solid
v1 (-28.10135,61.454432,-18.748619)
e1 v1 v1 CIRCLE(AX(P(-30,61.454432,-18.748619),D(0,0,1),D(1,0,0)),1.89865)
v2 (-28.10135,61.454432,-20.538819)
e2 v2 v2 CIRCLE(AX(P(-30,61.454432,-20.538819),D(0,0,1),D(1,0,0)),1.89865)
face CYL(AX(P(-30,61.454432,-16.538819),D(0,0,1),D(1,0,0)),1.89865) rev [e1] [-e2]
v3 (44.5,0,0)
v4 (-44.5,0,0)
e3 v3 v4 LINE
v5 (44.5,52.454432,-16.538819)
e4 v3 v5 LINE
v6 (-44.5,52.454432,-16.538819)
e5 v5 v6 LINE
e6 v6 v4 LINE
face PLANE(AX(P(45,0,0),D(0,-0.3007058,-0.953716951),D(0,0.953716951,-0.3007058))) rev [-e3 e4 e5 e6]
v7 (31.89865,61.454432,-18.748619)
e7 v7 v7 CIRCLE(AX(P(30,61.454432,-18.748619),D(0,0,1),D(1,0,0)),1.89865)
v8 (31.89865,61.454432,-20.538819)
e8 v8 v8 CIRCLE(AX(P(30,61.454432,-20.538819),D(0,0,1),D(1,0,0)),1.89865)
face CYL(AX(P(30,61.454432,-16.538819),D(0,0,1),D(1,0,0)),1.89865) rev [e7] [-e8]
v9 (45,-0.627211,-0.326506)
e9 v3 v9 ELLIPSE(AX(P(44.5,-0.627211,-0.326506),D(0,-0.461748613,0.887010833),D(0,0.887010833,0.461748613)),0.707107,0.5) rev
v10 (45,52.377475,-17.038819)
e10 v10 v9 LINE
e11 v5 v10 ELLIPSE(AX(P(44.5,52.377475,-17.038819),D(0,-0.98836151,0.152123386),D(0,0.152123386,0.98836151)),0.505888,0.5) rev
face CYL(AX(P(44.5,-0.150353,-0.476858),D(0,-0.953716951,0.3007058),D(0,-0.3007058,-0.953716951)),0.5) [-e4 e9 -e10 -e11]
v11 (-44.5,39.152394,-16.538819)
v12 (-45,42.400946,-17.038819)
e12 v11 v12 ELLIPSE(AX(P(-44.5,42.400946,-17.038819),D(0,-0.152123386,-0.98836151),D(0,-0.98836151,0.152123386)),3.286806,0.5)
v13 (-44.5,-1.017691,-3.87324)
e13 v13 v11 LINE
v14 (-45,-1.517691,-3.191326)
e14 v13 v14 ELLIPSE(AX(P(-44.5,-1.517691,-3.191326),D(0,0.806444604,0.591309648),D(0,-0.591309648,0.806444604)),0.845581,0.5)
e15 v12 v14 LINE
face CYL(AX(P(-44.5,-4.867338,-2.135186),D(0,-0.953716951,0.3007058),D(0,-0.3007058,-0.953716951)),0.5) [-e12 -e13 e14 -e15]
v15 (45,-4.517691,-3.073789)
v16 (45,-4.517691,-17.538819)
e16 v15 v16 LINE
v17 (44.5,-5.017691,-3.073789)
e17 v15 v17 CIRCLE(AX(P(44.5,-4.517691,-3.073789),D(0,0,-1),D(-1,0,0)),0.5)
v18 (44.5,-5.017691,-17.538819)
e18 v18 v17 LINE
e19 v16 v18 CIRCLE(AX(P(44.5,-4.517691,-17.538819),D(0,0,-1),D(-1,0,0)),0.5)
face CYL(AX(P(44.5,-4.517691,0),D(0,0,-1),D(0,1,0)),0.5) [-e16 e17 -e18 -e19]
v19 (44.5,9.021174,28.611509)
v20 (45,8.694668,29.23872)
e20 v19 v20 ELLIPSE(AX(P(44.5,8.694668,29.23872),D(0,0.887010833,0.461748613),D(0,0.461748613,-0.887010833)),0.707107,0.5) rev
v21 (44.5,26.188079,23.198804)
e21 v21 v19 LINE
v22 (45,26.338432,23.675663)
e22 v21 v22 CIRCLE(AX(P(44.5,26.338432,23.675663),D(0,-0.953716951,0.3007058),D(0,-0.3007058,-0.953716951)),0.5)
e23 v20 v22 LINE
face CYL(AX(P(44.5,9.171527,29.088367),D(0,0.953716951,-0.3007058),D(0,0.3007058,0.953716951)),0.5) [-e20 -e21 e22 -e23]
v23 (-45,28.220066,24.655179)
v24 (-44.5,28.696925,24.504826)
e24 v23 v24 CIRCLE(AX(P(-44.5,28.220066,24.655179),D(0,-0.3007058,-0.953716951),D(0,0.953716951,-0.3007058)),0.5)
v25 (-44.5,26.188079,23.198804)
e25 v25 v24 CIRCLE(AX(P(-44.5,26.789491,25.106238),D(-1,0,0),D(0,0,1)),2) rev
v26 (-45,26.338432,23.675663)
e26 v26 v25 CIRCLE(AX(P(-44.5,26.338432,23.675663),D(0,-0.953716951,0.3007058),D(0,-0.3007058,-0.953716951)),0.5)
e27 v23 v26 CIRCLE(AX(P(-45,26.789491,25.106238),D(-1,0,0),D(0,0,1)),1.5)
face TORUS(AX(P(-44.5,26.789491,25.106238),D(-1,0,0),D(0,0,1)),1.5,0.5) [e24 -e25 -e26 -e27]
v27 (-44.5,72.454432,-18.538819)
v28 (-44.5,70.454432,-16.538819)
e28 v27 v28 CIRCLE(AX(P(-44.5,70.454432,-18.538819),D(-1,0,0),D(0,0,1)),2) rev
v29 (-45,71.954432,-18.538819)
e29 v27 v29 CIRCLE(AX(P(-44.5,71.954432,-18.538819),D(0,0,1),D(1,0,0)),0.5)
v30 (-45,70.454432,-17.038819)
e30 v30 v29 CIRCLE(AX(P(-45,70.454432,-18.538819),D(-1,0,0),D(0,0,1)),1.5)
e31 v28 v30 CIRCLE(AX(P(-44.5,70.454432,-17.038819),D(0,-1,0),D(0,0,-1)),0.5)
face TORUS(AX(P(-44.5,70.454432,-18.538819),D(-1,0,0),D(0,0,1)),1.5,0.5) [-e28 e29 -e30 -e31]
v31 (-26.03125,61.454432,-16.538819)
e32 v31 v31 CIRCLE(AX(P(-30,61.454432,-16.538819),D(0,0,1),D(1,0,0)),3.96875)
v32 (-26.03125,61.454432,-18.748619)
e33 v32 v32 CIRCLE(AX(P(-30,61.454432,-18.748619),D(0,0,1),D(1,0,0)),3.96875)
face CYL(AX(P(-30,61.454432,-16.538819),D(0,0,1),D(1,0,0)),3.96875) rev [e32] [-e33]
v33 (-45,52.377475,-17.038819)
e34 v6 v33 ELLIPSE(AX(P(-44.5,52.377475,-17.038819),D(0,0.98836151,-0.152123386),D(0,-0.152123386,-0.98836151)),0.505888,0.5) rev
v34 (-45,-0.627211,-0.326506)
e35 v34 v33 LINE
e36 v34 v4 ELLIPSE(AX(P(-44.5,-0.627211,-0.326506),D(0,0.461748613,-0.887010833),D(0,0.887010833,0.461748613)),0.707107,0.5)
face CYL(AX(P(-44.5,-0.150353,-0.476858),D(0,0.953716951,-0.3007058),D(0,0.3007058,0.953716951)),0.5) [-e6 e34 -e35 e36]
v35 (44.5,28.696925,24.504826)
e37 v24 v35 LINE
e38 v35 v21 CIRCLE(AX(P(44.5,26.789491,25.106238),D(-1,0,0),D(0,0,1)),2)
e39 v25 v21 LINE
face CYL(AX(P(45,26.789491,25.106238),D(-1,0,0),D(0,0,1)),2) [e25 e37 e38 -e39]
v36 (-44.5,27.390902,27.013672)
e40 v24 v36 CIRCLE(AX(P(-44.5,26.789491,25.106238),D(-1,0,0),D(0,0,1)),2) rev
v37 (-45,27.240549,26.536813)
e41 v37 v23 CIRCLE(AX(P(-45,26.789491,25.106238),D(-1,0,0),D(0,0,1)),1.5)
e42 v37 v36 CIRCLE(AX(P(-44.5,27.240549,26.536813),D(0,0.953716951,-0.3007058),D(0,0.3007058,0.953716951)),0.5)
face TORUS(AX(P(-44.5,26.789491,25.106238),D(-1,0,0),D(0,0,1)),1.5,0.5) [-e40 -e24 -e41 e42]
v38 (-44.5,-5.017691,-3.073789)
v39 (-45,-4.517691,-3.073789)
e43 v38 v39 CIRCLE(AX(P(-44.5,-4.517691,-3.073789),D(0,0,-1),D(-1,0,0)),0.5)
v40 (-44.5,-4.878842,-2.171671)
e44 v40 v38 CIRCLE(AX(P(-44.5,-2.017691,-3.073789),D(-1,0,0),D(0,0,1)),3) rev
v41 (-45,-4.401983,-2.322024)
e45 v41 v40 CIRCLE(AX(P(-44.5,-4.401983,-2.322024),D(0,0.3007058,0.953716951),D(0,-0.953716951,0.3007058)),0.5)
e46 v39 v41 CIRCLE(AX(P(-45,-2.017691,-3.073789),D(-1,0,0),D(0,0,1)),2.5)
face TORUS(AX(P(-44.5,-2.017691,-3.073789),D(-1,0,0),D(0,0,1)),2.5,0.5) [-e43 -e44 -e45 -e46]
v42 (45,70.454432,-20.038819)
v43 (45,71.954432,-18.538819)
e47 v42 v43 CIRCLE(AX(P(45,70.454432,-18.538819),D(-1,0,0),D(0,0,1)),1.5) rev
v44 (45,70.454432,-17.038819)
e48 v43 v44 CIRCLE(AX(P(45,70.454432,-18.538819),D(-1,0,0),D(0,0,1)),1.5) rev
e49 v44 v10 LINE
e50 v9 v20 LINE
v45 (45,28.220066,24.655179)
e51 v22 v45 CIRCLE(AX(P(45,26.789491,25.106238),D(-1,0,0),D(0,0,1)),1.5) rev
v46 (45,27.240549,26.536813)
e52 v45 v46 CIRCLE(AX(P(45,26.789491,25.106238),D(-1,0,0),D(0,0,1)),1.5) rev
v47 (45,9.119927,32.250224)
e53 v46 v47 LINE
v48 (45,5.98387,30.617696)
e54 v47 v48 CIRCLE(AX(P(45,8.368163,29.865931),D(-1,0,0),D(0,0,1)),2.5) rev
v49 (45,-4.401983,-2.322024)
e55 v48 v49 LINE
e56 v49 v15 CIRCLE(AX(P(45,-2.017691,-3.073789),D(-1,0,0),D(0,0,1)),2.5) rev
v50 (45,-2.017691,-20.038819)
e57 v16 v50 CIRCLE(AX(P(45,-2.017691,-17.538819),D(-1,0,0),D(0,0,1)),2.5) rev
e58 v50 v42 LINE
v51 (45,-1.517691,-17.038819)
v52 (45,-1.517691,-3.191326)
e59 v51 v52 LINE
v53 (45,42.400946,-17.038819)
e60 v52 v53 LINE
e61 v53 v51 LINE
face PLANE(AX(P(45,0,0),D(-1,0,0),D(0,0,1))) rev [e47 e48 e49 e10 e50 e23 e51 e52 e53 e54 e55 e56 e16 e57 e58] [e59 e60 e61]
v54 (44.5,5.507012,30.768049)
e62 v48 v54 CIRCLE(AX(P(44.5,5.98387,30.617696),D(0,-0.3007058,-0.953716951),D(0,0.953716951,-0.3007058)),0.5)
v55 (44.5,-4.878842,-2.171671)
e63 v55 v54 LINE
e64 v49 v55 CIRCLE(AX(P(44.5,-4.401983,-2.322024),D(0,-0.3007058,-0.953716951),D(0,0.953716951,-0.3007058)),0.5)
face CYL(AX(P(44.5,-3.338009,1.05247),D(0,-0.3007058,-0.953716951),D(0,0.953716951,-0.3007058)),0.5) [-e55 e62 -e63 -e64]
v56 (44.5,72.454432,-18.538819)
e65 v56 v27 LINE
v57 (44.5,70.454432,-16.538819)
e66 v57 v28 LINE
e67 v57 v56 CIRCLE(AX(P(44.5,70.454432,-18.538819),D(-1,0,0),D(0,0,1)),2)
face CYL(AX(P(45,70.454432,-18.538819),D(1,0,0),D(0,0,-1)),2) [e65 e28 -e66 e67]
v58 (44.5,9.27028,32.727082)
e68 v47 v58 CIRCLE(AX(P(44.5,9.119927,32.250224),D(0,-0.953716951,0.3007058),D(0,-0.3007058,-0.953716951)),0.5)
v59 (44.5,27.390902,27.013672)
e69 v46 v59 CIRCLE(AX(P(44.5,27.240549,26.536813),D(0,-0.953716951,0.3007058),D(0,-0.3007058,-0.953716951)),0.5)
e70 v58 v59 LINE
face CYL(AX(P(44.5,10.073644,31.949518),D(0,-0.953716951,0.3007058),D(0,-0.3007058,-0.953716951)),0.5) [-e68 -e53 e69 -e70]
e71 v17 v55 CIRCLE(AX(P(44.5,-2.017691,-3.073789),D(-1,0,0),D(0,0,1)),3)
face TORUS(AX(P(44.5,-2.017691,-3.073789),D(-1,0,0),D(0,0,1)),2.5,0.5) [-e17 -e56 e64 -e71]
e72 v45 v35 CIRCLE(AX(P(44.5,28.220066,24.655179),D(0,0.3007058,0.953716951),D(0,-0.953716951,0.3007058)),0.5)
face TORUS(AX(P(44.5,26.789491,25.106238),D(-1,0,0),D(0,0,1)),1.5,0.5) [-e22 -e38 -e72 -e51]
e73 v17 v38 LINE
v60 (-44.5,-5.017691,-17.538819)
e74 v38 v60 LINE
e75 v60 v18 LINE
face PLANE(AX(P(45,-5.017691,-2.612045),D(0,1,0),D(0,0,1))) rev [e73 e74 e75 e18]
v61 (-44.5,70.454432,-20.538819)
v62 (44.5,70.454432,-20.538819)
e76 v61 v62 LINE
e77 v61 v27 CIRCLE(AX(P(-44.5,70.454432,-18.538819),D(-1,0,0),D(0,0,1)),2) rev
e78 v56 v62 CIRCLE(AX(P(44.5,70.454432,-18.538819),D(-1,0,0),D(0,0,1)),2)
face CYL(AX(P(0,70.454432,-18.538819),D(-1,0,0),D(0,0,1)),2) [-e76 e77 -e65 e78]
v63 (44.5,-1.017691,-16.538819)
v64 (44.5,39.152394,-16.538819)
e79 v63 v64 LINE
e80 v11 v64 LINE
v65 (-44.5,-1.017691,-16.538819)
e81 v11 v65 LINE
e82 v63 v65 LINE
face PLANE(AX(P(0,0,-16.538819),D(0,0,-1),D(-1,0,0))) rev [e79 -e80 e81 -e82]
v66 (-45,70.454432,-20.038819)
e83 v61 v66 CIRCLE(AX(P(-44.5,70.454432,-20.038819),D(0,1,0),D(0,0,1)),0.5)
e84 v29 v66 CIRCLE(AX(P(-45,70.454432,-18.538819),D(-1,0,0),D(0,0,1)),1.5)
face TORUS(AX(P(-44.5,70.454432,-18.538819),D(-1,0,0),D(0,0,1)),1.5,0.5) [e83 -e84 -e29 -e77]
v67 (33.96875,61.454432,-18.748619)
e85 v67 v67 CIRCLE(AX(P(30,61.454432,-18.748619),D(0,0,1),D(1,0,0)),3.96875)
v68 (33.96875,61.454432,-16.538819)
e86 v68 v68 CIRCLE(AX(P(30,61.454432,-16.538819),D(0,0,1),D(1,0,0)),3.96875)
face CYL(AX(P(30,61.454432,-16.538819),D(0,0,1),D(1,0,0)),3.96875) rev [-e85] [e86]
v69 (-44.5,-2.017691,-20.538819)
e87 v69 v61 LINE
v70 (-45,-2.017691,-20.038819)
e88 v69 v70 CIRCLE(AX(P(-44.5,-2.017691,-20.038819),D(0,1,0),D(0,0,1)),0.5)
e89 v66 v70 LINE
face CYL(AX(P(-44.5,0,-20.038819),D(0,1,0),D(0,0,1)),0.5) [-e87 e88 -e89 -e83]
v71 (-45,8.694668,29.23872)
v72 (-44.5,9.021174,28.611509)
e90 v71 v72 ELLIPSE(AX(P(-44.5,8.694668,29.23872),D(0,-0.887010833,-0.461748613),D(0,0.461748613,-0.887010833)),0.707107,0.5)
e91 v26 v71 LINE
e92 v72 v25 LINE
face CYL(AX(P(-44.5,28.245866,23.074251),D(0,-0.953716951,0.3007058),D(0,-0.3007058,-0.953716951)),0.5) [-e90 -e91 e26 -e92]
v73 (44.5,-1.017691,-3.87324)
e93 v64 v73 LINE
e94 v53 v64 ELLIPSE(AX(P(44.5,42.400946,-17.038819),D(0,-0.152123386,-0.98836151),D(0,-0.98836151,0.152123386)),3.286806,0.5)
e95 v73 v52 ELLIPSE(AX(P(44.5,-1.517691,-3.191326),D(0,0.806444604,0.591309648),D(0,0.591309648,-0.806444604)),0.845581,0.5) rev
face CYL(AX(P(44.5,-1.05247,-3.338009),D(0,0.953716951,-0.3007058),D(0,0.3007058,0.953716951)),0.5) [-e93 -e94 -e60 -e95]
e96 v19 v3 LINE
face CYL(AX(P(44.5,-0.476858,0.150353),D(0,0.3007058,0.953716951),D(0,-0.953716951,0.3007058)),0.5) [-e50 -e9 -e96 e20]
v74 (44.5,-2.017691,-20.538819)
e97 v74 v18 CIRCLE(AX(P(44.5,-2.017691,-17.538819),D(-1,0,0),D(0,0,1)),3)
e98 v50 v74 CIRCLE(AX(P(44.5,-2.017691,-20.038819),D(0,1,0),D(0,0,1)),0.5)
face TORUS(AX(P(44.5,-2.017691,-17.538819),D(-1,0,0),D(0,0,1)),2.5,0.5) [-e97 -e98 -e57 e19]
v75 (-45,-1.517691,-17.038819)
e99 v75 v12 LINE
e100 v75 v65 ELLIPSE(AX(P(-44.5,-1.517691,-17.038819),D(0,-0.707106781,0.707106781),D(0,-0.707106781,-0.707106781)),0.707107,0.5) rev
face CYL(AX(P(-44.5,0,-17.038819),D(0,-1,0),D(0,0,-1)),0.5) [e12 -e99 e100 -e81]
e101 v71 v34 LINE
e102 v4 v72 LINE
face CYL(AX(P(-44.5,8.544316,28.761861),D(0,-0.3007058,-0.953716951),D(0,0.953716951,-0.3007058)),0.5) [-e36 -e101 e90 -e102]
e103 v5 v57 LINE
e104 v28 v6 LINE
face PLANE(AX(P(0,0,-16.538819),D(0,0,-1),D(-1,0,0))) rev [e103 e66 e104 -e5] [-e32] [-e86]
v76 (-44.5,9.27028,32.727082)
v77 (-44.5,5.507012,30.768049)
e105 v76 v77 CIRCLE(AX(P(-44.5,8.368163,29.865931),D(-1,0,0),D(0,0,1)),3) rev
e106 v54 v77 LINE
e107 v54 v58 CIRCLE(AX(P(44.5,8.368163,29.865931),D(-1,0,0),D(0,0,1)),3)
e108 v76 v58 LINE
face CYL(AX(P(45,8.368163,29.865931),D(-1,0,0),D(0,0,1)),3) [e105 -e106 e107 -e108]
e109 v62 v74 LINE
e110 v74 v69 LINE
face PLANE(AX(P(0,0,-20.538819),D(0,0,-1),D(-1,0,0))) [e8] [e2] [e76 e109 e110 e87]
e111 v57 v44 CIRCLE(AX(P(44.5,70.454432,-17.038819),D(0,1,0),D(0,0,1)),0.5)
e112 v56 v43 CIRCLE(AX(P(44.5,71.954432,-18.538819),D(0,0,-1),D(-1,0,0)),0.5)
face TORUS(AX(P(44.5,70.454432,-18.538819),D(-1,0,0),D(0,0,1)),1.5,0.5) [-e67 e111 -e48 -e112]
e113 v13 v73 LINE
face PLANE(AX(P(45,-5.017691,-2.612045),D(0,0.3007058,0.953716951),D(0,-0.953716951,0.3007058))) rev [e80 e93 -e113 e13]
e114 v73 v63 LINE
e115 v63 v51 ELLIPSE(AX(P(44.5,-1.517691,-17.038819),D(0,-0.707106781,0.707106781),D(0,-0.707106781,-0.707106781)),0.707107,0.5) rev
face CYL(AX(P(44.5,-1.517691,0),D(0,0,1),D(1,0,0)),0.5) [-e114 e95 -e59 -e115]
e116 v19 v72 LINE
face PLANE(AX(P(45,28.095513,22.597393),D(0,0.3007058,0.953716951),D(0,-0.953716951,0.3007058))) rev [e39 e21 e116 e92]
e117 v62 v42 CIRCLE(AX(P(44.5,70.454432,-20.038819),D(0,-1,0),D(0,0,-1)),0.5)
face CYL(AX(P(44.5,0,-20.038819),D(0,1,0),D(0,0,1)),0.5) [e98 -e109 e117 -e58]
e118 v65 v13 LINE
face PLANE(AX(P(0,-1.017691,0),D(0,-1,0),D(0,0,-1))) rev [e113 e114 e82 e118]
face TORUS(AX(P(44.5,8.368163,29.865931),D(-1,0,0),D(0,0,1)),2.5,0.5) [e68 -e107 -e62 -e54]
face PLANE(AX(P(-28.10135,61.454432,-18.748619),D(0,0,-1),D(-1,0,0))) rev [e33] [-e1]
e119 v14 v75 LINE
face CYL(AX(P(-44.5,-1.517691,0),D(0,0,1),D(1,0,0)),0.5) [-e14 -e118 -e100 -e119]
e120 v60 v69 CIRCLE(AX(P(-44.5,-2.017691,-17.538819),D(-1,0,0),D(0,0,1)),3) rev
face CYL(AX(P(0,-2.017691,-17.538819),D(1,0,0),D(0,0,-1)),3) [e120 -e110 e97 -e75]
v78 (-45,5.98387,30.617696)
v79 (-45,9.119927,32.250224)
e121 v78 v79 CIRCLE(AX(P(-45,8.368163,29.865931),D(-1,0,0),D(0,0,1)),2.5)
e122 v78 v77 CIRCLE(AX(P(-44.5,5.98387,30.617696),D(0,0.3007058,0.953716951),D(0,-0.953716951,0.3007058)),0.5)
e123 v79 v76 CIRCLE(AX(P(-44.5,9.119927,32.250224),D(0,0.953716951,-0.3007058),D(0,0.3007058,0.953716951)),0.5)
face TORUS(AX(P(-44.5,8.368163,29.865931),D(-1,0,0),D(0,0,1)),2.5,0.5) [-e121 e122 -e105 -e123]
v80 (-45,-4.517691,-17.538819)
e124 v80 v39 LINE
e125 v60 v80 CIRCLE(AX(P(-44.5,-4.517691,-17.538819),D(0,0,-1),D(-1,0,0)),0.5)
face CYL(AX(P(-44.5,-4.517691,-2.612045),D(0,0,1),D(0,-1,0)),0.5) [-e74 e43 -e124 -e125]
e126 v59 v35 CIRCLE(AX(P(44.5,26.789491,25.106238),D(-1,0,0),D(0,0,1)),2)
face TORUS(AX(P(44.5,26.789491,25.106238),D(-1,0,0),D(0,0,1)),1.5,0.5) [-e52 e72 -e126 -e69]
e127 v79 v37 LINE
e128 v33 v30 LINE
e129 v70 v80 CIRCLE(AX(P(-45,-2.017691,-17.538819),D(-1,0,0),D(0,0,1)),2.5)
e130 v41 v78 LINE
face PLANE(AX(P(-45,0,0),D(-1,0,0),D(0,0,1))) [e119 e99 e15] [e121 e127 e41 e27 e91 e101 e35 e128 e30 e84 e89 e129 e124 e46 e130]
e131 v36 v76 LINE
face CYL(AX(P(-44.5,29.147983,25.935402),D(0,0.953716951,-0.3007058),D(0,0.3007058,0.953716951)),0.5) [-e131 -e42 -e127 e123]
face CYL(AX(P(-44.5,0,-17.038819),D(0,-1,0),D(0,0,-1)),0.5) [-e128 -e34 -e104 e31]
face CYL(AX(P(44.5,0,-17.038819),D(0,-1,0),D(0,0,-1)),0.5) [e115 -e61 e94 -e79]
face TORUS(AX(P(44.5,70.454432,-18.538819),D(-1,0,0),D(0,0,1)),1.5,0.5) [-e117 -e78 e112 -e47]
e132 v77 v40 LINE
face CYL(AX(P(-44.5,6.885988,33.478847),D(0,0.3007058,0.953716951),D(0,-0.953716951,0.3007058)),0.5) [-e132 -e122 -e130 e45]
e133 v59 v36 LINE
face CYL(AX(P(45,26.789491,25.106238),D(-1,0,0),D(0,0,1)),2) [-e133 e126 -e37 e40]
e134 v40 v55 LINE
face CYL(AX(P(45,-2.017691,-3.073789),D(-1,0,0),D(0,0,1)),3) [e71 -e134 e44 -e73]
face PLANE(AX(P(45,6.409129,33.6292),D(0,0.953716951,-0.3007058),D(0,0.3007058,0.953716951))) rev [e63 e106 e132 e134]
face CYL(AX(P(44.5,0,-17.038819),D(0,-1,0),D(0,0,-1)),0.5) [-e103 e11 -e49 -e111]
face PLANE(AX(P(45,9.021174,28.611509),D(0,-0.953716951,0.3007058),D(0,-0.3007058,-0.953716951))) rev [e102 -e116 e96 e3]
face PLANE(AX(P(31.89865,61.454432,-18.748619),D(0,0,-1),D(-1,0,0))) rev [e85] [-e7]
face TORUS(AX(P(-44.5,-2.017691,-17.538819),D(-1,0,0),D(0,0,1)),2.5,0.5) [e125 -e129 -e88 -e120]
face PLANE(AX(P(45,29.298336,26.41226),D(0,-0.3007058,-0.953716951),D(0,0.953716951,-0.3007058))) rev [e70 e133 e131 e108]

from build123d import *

# Parameters (mm, degrees)
BOSS_EXTRUDE1_DEPTH                                 = 45
CUT_EXTRUDE1_DEPTH                                  = 119.485655068
SKETCH3_W                                           = 90
SKETCH3_H                                           = 97.472123292
BOSS_EXTRUDE2_DEPTH                                 = 4
SKETCH4_W                                           = 17.926774368
SKETCH4_H                                           = 20
CUT_EXTRUDE2_DEPTH                                  = 121.335230998
SKETCH5_W                                           = 90
SKETCH5_H                                           = 17.926774368
BOSS_EXTRUDE3_DEPTH                                 = 4
FILLET7_R                                           = 3
FILLET8_R                                           = 2
FILLET9_R                                           = 0.5
CBORE_FOR_6_BINDING_HEAD_MACHINE_SCREW1_D           = 3.7973
CBORE_FOR_6_BINDING_HEAD_MACHINE_SCREW1_CBORE_D     = 7.9375
CBORE_FOR_6_BINDING_HEAD_MACHINE_SCREW1_CBORE_DEPTH = 2.2098


with BuildPart() as part:
    # Sketch1 → Boss-Extrude1 (new, symmetric)
    with BuildSketch(Plane(origin=(0, 0, 0), x_dir=(0, 0, -1), z_dir=(1, 0, 0))):
        Polygon((-22.597392532, 28.095513), (-28.611508522, 9.021173985), (0, 0), (16.538818973, 52.454432291), (26.538818973, 52.454432291), (55.495428229, -3.170696548), (56.456912684, -5.017691001), (51.947384896, -5.017691001), (24.111559387, 48.454432291), (19.471740318, 48.454432291), (2.612044605, -5.017691001), (-33.629199523, 6.40912938), (-26.412260335, 29.298336198), align=None)
    extrude(amount=BOSS_EXTRUDE1_DEPTH, both=True)

    # Sketch2 → Cut-Extrude1 (cut, through all)
    with BuildSketch(Plane(origin=(45, 0, 0), x_dir=(0, 0, -1), z_dir=(1, 0, 0))):
        Polygon((16.538818973, 52.454432291), (16.538818973, 39.152394197), (19.471740318, 48.454432291), (24.111559387, 48.454432291), (51.947384896, -5.017691001), (56.456912684, -5.017691001), (26.538818973, 52.454432291), align=None)
    extrude(amount=-CUT_EXTRUDE1_DEPTH, mode=Mode.SUBTRACT)

    # Sketch3 → Boss-Extrude2 (add)
    with BuildSketch(Plane(origin=(0, 0, -16.538818973), x_dir=(-1, 0, 0), z_dir=(0, 0, -1))):
        with Locations((0, 23.718370645)):
            Rectangle(SKETCH3_W, SKETCH3_H)
    extrude(amount=BOSS_EXTRUDE2_DEPTH)

    # Sketch4 → Cut-Extrude2 (cut, through all)
    with BuildSketch(Plane.ZY.offset(45)):
        with Locations((-11.575431789, -15.017691001)):
            Rectangle(SKETCH4_W, SKETCH4_H)
    extrude(amount=-CUT_EXTRUDE2_DEPTH, mode=Mode.SUBTRACT)

    # Sketch5 → Boss-Extrude3 (add)
    with BuildSketch(Plane.XZ.offset(5.017691001)):
        with Locations((0, -11.575431789)):
            Rectangle(SKETCH5_W, SKETCH5_H)
    extrude(amount=-BOSS_EXTRUDE3_DEPTH)

    # Fillet7
    fillet7_edges = [part.edges().sort_by_distance(p)[0] for p in [
        (0, -5.017691001, -2.612044605),
        (0, 6.40912938, 33.629199523),
        (0, -5.017691001, -20.538818973),
    ]]
    fillet(fillet7_edges, radius=FILLET7_R)

    # Fillet8
    fillet8_edges = [part.edges().sort_by_distance(p)[0] for p in [
        (0, 72.454432291, -16.538818973),
        (0, 28.095513, 22.597392532),
        (0, 72.454432291, -20.538818973),
        (0, 29.298336198, 26.412260335),
    ]]
    fillet(fillet8_edges, radius=FILLET8_R - 0.0001)  # a hair under: the kernel refuses the full size

    # Fillet9
    fillet9_edges = [part.edges().sort_by_distance(p)[0] for p in [
        (-45, 19.067351598, -16.538818973),
        (-45, 19.067351598, -10.206029367),
        (45, 19.067351598, -10.206029367),
        (-45, -1.017691001, -10.206029367),
        (45, -1.017691001, -10.206029367),
        (-45, 34.218420645, -20.538818973),
        (-45, -5.017691001, -10.30630387),
        (-45, 0.314085064, 14.298188651),
        (-45, 6.982916994, 32.526963772),
        (-45, -4.982775532, -2.61741861),
        (-45, 17.604674228, 25.905141292),
        (-45, -4.139011345, -19.660139316),
        (45, -5.017691001, -10.30630387),
        (45, 0.314085064, 14.298188651),
        (45, 6.982916994, 32.526963772),
        (-45, 4.510586993, 14.305754261),
        (45, -4.982775532, -2.61741861),
        (45, -4.139011345, -19.660139316),
        (-45, 26.227216146, -8.269409486),
        (45, 34.218420645, -20.538818973),
        (45, 61.454482291, -16.538818973),
        (45, 18.33063895, 29.870361994),
        (45, 28.563549105, 26.029754386),
        (45, 27.71300705, 23.332179625),
        (45, 71.868675143, -19.953061824),
        (45, 71.868675143, -17.124576121),
        (-45, 18.33063895, 29.870361994),
        (-45, 28.563549105, 26.029754386),
        (-45, 27.71300705, 23.332179625),
        (-45, 71.868675143, -19.953061824),
        (-45, 71.868675143, -17.124576121),
        (45, 26.227216146, -8.269409486),
        (45, 4.510586993, 14.305754261),
        (45, 17.604674228, 25.905141292),
        (-45, 61.454482291, -16.538818973),
        (45, 19.067351598, -16.538818973),
    ]]
    fillet(fillet9_edges, radius=FILLET9_R)

    # CBORE for #6 Binding Head Machine Screw1 (through all)
    with Locations(Plane.XY.offset(-16.538818973)):
        with Locations((-30, 61.454432291), (30, 61.454432291)):
            CounterBoreHole(CBORE_FOR_6_BINDING_HEAD_MACHINE_SCREW1_D / 2, CBORE_FOR_6_BINDING_HEAD_MACHINE_SCREW1_CBORE_D / 2, CBORE_FOR_6_BINDING_HEAD_MACHINE_SCREW1_CBORE_DEPTH)


solid = part.part
